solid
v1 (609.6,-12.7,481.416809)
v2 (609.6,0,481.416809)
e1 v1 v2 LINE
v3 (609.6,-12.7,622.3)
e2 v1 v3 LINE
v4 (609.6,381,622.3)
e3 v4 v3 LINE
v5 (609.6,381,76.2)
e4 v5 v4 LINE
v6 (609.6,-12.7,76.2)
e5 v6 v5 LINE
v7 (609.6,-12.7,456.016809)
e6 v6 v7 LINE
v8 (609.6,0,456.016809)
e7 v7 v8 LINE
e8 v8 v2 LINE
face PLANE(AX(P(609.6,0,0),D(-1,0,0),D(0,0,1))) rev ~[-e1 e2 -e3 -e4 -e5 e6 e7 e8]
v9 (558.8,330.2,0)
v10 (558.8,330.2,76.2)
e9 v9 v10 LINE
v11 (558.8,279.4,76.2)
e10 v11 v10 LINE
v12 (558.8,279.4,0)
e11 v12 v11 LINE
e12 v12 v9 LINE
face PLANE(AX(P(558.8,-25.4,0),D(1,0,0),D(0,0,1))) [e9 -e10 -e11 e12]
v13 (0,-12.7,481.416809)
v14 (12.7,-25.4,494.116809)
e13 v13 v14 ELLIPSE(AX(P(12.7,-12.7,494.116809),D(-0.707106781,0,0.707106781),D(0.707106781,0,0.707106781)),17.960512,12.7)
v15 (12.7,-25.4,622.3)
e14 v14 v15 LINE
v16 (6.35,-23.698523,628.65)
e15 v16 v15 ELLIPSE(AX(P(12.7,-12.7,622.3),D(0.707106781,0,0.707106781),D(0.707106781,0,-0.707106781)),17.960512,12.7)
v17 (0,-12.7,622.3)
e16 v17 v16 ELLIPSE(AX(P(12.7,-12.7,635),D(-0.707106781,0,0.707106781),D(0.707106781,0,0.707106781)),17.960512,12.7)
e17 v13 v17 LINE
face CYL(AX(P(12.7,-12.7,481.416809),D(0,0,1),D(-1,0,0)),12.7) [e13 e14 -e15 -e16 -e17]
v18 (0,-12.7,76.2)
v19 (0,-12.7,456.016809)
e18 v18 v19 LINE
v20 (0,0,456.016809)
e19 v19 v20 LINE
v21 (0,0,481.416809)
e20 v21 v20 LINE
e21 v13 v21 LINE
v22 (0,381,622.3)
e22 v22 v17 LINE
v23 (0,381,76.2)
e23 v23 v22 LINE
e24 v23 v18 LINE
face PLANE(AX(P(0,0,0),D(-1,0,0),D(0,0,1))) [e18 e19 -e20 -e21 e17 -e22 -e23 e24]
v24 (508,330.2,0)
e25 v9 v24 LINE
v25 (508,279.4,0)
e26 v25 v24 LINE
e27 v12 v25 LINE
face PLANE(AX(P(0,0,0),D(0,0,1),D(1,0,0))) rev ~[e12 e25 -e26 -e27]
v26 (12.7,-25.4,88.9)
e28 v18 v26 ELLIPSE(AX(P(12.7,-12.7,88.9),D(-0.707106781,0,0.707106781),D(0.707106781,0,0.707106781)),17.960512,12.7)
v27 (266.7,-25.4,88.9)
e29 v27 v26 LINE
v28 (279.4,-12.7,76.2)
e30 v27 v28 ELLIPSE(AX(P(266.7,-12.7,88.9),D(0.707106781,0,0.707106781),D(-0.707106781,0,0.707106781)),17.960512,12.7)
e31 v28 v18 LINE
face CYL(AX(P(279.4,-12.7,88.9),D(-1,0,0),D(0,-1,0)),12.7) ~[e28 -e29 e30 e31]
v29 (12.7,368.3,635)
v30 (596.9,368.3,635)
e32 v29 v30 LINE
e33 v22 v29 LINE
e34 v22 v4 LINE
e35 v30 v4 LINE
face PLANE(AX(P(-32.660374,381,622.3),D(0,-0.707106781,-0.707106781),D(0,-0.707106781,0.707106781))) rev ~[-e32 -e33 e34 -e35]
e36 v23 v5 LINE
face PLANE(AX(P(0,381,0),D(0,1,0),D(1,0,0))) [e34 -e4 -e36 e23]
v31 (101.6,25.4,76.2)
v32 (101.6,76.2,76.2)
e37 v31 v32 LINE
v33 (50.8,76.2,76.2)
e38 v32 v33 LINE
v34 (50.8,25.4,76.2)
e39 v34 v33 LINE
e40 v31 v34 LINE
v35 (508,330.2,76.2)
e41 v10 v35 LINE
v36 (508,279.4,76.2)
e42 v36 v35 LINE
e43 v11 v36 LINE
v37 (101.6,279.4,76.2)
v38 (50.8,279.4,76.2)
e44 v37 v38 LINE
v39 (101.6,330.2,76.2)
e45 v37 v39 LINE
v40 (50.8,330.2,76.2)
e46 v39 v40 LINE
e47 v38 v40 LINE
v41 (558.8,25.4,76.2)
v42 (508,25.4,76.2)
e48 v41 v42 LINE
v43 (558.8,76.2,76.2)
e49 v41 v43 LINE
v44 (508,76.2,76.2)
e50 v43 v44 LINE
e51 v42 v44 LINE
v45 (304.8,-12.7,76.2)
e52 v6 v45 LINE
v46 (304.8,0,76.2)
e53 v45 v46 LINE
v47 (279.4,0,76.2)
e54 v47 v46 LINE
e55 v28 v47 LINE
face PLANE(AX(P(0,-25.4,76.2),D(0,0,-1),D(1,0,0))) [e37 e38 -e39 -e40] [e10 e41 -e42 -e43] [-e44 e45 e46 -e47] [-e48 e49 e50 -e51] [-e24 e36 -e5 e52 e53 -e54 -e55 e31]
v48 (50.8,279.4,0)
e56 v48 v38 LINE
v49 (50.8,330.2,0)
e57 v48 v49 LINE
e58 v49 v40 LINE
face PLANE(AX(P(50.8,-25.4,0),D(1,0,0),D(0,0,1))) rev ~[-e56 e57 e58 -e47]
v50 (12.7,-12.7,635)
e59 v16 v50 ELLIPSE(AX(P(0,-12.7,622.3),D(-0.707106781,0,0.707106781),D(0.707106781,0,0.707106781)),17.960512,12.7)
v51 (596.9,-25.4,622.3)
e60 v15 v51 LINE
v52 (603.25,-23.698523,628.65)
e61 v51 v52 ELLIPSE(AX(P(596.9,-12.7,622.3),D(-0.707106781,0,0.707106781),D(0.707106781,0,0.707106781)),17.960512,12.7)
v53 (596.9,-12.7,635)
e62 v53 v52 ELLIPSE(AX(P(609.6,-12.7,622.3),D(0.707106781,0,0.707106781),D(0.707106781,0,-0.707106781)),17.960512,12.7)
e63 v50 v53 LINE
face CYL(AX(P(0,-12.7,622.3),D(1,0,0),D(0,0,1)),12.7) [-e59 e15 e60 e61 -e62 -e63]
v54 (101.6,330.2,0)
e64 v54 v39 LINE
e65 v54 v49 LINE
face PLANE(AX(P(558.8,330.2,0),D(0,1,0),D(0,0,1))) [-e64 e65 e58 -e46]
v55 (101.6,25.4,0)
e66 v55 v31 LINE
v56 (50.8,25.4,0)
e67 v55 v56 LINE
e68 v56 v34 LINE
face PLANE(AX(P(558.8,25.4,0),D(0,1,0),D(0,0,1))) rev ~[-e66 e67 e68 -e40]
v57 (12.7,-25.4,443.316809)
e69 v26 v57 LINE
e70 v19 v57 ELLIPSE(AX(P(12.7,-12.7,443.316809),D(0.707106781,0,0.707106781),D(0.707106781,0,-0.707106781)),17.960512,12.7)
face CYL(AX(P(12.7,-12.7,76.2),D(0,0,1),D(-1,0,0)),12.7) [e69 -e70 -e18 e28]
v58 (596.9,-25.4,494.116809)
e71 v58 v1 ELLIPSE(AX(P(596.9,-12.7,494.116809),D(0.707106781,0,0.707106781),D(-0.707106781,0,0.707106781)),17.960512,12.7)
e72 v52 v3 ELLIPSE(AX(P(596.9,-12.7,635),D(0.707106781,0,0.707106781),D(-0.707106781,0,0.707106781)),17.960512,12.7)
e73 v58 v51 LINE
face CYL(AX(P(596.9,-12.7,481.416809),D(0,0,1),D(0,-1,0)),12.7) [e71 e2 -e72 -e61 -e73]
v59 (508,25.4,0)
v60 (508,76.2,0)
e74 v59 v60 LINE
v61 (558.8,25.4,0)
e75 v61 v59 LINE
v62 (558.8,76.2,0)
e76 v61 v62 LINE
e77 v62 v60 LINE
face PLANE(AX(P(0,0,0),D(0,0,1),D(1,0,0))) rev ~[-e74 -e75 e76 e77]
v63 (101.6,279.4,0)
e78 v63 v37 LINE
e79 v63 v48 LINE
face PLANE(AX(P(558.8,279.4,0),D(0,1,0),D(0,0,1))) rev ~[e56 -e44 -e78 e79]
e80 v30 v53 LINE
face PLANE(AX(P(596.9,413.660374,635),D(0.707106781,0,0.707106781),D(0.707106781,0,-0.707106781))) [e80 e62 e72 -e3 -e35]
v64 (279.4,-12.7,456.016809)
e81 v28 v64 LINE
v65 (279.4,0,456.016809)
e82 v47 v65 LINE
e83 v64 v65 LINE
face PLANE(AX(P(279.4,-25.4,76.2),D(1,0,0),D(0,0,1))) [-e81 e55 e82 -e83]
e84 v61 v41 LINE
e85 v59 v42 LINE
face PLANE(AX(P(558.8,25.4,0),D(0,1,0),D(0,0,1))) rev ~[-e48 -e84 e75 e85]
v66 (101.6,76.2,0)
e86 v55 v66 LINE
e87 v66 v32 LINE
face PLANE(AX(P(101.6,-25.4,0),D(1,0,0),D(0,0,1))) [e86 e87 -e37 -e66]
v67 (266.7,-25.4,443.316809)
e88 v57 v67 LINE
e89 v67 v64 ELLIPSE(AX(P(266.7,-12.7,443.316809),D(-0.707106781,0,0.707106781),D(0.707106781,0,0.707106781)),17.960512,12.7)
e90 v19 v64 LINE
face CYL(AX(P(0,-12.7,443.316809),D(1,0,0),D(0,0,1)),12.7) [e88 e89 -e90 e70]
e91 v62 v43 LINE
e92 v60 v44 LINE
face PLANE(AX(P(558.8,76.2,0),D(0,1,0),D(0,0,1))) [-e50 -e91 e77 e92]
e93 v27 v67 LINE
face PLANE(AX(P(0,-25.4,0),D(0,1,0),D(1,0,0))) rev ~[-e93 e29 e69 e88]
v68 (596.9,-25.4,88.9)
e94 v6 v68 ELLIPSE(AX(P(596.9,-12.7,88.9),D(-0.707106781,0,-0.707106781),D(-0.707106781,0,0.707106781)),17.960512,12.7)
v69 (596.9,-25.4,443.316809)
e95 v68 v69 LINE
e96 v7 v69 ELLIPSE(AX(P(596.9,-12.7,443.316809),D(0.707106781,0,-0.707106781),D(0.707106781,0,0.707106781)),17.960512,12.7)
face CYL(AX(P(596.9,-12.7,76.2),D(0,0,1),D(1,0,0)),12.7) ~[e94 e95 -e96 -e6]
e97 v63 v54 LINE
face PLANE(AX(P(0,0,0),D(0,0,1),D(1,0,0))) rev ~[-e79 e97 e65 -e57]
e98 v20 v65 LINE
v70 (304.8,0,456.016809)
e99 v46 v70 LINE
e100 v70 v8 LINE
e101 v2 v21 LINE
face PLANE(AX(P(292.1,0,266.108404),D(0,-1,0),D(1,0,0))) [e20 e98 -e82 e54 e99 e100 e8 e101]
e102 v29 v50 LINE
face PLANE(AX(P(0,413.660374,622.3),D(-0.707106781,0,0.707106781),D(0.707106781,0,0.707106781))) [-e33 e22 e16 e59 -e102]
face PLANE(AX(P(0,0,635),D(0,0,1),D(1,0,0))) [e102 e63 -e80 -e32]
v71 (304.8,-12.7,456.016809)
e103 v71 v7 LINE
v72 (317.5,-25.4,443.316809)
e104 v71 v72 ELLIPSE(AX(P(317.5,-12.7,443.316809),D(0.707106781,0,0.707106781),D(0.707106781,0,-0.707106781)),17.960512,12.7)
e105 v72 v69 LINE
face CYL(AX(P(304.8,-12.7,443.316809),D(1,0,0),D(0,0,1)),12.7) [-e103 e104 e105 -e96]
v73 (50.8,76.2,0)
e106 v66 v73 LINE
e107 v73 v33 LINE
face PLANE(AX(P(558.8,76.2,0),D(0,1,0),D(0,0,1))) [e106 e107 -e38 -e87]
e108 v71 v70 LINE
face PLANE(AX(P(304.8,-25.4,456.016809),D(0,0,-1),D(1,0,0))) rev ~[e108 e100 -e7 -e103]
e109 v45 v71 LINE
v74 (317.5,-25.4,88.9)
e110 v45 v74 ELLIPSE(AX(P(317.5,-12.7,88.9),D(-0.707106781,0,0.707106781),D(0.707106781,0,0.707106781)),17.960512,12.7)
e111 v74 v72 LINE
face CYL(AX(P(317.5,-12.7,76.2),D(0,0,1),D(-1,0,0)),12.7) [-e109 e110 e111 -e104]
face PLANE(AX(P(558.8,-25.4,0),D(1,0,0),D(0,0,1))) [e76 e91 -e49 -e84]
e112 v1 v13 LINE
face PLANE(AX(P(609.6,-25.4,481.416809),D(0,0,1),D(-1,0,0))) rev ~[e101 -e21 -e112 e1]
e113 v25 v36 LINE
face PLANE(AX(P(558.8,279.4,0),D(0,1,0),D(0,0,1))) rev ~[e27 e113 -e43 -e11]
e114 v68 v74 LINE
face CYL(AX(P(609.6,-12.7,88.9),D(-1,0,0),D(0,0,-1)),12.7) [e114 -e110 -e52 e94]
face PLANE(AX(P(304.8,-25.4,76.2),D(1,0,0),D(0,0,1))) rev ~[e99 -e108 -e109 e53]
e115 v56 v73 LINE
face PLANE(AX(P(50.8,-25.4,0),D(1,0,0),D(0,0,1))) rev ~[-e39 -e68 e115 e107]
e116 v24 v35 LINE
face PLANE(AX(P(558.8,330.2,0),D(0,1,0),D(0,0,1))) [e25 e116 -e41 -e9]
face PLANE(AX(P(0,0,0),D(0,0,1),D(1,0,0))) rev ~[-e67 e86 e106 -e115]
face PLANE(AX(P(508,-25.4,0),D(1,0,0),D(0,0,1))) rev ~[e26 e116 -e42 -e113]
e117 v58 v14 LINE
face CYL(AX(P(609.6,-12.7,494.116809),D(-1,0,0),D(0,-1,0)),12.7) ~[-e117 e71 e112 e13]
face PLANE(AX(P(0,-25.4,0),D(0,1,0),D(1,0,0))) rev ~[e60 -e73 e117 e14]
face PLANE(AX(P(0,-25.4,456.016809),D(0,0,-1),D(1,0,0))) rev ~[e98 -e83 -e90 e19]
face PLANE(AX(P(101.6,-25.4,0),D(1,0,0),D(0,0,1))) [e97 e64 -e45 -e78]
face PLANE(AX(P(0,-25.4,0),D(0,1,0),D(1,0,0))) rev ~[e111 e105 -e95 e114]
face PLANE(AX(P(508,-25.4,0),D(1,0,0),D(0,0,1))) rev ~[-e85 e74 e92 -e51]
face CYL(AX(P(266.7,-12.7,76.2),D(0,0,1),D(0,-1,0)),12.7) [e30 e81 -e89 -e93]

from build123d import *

# Parameters (mm, degrees)
F0_W         = 609.6
F0_H         = 381
F1_DEPTH     = 635
F2_DEPTH     = 25.4
F3_W         = 50.8
F3_H         = 76.2
F3_W_2       = 406.4
F4_DEPTH     = 1574.8
F5_W         = 50.8
F5_H         = 76.2
F5_W_2       = 203.2
F6_DEPTH     = 970.28
F7_W         = 25.4
F7_H         = 379.8168087482
F8_DEPTH     = 25.4
F9_R         = 12.7
F10_T1_DEPTH = 459.0207478943
F10_T3_DEPTH = 674.9207478943


# Not quite as in the source:
# - a fillet or chamfer that OpenCascade refuses, or shapes differently, is made with other operations: its cross-section is extruded or revolved along the edge and cut away or added


with BuildPart() as f1:
    # F0 (on Top) → F1 (new body)
    with BuildSketch(Plane.XY):
        with Locations((304.8, 190.5)):
            Rectangle(F0_W, F0_H)
    extrude(amount=F1_DEPTH)

    # F2 (add): a face of the model
    f2_faces = [f1.faces().sort_by_distance(p)[0] for p in [
        (304.8, 0, 317.5),
    ]]
    extrude(f2_faces, amount=F2_DEPTH)

    # F3 (on face) → F4 (cut)
    with BuildSketch(Plane.XZ.offset(25.4)):
        with Locations((25.4, 38.1)):
            Rectangle(F3_W, F3_H)
        with Locations((304.8, 38.1)):
            Rectangle(F3_W_2, F3_H)
        with Locations((584.2, 38.1)):
            Rectangle(F3_W, F3_H)
    extrude(amount=-F4_DEPTH, mode=Mode.SUBTRACT)

    # F5 (on face) → F6 (cut)
    with BuildSketch(Plane.YZ.offset(558.8)):
        with Locations((0, 38.1)):
            Rectangle(F5_W, F5_H)
        with Locations((177.8, 38.1)):
            Rectangle(F5_W_2, F5_H)
        with Locations((355.6, 38.1)):
            Rectangle(F5_W, F5_H)
    extrude(amount=-F6_DEPTH, mode=Mode.SUBTRACT)

    # F7 (on face) → F8 (cut)
    with BuildSketch(Plane.XZ.offset(25.4)):
        with Locations((292.1, 266.1084043741)):
            Rectangle(F7_W, F7_H)
        Polygon((609.6, 481.4168087482), (0, 481.4168087482), (0, 456.0168087482), (279.4, 456.0168087482), (304.8, 456.0168087482), (609.6, 456.0168087482), align=None)
    extrude(amount=-F8_DEPTH, mode=Mode.SUBTRACT)

    # F9
    f9_edges = [f1.edges().sort_by_distance(p)[0] for p in [
        (609.6, -25.4, 558.208404),
        (304.8, -25.4, 635),
        (0, -25.4, 558.208404),
        (304.8, -25.4, 481.416809),
        (279.4, -25.4, 266.108404),
        (139.7, -25.4, 456.016809),
        (0, -25.4, 266.108404),
        (139.7, -25.4, 76.2),
        (609.6, -25.4, 266.108404),
        (457.2, -25.4, 456.016809),
        (304.8, -25.4, 266.108404),
        (457.2, -25.4, 76.2),
    ]]
    fillet(f9_edges, radius=F9_R)

    # F10: chamfer of 12.7 on 4 edges, made by hand

    # F10_s2 → F10_t1 (cut)
    with BuildSketch(Plane.XZ.offset(-413.6603739472)):
        Polygon((0, 622.3), (12.7, 635), (0, 635), align=None)
        Polygon((596.9, 635), (609.6, 622.3), (609.6, 635), align=None)
    extrude(amount=F10_T1_DEPTH, mode=Mode.SUBTRACT)

    # F10_s4 → F10_t3 (cut)
    with BuildSketch(Plane.YZ.offset(-32.6603739472)):
        Polygon((381, 622.3), (368.3, 635), (381, 635), align=None)
    extrude(amount=F10_T3_DEPTH, mode=Mode.SUBTRACT)


solid = f1.part
